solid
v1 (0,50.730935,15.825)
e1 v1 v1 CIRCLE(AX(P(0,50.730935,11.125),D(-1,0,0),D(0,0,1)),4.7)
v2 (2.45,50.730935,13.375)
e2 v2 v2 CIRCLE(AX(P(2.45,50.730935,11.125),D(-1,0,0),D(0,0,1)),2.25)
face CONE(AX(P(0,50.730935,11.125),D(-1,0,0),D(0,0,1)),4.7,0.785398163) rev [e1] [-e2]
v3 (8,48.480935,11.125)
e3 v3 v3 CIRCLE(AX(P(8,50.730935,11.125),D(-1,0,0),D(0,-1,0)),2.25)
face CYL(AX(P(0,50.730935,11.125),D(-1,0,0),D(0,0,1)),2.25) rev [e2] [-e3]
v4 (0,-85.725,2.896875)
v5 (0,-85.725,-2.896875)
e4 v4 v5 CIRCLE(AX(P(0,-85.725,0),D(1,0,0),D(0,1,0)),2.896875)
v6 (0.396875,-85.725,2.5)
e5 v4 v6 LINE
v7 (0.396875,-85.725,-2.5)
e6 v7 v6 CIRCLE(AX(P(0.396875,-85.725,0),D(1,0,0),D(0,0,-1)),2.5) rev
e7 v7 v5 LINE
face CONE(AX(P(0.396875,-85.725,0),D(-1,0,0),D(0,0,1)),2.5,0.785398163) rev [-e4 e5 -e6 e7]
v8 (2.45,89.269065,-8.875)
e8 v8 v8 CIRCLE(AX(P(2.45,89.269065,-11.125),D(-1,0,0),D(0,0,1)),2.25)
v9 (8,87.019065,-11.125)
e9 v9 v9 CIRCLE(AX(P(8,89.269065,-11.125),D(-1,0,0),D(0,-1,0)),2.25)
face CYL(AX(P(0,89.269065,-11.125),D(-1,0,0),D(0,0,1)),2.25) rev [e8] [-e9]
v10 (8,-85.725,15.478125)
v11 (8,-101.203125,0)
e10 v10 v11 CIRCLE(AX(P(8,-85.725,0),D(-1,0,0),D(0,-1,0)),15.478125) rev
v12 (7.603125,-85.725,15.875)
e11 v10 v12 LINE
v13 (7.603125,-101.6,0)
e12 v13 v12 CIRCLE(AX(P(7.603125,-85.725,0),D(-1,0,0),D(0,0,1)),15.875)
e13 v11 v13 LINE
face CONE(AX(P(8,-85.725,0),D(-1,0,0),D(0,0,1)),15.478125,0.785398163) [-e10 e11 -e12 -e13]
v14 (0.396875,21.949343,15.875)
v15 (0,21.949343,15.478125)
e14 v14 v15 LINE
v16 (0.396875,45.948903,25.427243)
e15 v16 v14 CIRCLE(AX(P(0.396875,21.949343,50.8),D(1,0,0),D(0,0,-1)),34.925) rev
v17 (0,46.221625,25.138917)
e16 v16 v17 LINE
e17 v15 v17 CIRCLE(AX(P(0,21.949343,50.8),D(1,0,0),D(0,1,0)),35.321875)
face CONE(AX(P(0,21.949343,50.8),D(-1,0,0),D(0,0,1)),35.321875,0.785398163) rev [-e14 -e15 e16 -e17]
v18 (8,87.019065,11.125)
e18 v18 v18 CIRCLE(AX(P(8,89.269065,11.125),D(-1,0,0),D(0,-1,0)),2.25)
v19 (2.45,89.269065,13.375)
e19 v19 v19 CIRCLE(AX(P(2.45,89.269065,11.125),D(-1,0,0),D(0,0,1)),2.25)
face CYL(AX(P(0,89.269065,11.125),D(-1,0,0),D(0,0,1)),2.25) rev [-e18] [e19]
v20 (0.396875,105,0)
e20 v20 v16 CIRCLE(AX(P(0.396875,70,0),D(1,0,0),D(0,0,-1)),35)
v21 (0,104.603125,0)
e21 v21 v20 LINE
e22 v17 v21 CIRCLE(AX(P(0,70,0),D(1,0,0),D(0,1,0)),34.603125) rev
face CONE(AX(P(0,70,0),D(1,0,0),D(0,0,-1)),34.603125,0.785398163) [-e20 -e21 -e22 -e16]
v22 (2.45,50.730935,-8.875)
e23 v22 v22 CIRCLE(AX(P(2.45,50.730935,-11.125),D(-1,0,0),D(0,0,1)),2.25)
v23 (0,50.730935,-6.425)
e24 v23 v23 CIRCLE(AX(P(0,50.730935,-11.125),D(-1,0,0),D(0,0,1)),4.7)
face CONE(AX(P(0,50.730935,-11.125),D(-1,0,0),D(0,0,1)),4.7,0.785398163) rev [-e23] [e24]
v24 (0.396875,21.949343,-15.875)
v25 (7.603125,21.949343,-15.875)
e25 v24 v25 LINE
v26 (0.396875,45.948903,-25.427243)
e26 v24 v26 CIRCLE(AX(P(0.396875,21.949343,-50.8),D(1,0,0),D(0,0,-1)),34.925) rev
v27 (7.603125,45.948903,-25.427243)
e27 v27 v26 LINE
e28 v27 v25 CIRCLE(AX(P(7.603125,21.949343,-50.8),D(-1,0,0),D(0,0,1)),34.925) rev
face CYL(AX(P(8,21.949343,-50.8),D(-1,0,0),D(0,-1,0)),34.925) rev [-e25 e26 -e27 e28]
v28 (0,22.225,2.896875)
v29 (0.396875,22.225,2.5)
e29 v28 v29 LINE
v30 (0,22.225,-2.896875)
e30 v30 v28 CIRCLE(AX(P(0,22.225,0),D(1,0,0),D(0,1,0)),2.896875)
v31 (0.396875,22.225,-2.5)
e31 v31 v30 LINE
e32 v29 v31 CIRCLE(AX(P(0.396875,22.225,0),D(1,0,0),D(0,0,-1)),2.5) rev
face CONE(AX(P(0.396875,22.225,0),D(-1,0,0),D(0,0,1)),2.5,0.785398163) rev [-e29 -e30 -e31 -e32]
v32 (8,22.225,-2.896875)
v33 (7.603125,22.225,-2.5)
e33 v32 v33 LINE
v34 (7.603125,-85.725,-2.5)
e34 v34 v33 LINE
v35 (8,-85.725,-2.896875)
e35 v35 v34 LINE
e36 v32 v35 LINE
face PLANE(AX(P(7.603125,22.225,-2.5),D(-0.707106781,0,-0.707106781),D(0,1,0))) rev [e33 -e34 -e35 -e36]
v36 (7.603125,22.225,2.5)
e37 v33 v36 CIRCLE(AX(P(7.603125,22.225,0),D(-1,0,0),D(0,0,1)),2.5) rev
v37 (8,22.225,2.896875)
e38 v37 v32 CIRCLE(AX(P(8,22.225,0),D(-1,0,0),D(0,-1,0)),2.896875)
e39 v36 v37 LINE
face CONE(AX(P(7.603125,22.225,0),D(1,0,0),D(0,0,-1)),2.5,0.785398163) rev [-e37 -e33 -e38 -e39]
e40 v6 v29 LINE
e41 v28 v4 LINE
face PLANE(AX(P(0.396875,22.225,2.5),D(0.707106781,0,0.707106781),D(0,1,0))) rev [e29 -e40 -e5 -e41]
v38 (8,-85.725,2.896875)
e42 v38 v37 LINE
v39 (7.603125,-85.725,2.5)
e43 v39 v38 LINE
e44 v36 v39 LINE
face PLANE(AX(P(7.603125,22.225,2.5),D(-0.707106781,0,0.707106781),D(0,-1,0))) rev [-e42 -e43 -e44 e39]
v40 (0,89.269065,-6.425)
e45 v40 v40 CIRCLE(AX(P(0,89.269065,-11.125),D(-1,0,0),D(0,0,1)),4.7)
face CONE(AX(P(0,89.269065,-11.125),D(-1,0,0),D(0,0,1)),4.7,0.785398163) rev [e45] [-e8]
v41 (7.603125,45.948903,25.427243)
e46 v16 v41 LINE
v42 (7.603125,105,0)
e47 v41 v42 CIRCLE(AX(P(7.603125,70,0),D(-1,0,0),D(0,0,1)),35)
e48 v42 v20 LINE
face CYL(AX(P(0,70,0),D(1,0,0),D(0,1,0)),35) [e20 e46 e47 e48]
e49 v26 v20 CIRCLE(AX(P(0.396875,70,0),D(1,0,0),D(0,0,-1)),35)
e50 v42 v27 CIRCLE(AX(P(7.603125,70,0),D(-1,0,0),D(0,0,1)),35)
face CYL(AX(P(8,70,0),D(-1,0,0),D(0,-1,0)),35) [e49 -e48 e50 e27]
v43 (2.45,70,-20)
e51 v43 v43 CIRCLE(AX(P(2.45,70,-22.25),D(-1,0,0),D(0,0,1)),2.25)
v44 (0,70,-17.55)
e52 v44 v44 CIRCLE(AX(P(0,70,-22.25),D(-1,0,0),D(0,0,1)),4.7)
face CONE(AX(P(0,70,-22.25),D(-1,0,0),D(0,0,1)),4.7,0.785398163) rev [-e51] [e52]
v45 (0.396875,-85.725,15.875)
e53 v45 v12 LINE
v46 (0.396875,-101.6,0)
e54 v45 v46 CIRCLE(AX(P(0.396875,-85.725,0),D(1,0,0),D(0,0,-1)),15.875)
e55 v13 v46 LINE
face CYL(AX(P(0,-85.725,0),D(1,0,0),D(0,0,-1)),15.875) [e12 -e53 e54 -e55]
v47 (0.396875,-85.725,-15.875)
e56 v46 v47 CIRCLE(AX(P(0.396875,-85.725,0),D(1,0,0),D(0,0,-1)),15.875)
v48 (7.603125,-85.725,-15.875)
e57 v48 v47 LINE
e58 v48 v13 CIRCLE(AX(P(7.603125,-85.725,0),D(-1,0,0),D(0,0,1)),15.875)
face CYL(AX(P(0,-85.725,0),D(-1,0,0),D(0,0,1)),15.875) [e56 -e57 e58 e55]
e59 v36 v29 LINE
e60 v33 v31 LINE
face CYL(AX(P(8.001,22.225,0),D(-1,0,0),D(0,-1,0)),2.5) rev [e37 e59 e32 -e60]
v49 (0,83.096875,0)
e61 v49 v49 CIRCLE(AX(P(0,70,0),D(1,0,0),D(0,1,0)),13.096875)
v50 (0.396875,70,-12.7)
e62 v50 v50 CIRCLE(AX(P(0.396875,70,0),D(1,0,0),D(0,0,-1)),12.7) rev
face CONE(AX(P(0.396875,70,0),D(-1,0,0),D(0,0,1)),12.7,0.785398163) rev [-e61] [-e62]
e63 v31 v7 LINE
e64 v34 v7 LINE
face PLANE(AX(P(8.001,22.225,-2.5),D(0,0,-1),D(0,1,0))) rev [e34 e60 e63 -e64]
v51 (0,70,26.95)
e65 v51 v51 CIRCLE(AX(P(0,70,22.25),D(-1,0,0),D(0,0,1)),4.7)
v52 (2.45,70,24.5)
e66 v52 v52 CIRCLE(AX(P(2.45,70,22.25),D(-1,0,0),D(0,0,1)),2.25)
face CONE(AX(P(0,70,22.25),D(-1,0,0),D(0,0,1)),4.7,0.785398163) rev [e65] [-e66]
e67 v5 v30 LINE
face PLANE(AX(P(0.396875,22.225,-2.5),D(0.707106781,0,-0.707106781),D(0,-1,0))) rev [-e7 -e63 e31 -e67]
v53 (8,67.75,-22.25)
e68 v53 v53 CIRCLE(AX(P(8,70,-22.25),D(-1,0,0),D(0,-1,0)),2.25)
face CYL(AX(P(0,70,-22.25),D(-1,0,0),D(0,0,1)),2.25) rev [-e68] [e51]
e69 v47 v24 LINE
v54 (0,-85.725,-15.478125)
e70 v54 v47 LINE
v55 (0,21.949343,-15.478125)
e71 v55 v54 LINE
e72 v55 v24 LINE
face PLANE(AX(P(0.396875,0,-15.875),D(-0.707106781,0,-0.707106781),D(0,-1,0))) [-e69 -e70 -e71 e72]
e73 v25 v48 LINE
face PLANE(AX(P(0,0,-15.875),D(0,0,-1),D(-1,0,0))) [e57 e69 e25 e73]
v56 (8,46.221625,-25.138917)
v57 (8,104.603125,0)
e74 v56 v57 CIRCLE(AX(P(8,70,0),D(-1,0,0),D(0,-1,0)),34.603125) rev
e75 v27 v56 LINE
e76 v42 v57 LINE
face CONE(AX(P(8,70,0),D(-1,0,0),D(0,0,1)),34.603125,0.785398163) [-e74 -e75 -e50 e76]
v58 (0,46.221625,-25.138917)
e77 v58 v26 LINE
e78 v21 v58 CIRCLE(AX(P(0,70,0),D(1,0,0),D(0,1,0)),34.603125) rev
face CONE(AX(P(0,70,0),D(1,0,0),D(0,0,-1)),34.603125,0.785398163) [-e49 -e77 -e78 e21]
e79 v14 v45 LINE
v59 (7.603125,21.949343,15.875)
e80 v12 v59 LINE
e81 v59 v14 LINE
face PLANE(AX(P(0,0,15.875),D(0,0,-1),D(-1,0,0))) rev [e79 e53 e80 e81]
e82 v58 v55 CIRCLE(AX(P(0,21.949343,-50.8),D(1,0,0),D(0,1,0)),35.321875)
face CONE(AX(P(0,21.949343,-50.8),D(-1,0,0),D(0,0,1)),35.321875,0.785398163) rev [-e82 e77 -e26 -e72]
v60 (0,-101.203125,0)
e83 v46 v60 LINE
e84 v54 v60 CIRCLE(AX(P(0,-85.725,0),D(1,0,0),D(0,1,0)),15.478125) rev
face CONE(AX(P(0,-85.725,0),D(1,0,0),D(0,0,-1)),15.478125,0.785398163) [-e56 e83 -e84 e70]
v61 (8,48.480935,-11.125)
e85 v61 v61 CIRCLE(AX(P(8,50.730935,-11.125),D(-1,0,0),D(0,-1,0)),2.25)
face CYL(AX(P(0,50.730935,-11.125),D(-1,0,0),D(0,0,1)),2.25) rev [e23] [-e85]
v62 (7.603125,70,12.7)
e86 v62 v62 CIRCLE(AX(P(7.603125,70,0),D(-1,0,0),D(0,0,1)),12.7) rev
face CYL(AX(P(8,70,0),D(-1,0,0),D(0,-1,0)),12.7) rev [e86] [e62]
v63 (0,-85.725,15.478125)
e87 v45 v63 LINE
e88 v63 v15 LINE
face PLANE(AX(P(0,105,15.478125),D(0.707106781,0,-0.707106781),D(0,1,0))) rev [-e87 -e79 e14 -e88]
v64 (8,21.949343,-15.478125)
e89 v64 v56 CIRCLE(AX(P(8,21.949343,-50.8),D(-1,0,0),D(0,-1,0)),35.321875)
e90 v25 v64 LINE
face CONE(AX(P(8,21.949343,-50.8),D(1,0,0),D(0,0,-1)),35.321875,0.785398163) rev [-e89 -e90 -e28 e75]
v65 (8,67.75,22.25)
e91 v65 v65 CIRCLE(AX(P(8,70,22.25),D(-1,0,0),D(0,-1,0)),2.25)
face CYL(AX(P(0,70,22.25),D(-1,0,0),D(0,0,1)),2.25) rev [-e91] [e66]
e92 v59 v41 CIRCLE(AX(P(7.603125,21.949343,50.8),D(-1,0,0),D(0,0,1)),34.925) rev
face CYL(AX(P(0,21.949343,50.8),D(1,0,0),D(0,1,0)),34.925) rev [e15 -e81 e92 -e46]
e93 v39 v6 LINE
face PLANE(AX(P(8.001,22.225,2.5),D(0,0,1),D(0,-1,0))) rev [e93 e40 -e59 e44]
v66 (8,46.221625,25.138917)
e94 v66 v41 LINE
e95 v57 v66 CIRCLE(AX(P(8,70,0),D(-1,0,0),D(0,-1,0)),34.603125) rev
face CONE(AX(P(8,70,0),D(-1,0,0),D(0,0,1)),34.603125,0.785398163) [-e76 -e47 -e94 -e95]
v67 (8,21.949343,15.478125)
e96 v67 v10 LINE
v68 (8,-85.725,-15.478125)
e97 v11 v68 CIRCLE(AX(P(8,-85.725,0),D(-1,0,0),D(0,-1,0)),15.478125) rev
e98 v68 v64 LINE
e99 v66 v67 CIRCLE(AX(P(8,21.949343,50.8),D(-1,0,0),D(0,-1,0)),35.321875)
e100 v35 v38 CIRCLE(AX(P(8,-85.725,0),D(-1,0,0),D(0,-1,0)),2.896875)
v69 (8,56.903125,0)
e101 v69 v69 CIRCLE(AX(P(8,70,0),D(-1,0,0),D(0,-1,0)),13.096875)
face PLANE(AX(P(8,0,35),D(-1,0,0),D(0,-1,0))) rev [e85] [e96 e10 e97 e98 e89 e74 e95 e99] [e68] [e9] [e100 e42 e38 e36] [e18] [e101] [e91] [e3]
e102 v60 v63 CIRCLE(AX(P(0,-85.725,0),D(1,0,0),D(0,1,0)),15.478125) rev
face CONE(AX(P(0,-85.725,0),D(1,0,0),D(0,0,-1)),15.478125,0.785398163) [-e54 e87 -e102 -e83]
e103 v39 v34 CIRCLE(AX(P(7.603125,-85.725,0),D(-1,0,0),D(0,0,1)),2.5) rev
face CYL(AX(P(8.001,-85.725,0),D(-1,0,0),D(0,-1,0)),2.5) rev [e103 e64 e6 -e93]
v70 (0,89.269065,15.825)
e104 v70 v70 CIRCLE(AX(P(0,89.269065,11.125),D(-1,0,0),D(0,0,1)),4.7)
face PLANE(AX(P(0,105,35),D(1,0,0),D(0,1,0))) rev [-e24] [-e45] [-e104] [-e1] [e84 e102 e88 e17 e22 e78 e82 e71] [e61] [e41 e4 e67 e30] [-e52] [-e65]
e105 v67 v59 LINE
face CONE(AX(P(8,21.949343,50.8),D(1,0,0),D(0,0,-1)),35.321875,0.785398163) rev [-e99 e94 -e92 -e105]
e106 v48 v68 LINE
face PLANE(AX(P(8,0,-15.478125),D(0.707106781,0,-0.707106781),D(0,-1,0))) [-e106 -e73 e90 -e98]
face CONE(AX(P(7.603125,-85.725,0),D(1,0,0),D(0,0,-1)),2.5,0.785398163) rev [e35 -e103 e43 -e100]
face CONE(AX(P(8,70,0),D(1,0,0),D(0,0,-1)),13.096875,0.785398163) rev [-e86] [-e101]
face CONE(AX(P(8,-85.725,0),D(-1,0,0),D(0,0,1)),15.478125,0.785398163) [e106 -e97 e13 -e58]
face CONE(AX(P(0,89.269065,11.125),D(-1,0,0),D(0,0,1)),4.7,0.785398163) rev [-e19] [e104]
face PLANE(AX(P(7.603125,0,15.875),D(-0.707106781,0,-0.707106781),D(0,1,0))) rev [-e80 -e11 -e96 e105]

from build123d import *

# Parameters (mm, degrees)
SKETCH1_W                                           = 8
SKETCH1_H                                           = 105
BASE_DEPTH                                          = 35
CSK_FOR_M4_COUNTERSUNK_FLAT_HEAD_SCREW2_D           = 4.5
CSK_FOR_M4_COUNTERSUNK_FLAT_HEAD_SCREW2_CSINK_D     = 9.4
CSK_FOR_M4_COUNTERSUNK_FLAT_HEAD_SCREW2_CSINK_ANGLE = 90
FILLET1_R                                           = 35
SKETCH8_W                                           = 8
SKETCH8_H                                           = 70
BOSS_EXTRUDE1_DEPTH                                 = 101.6
CUT_EXTRUDE1_REACH                                  = 112.968
CUT_EXTRUDE2_DEPTH                                  = 111.968463989
FILLET2_R                                           = 34.925
FILLET3_R                                           = 15.875
SKETCH12_R                                          = 12.7
CUT_EXTRUDE4_DEPTH                                  = 111.968463989
CHAMFER1_SIZE                                       = 0.396875


with BuildPart() as part:
    # Sketch1 → base (new, symmetric)
    with BuildSketch(Plane.XY):
        with Locations((4, 52.5)):
            Rectangle(SKETCH1_W, SKETCH1_H)
    extrude(amount=BASE_DEPTH, both=True)

    # CSK for M4 Countersunk Flat Head Screw2 (through all)
    with Locations(Plane.ZY):
        with Locations((-11.125, 50.730934766), (-22.25, 70), (-11.125, 89.269065234), (11.125, 89.269065234), (22.25, 70), (11.125, 50.730934766)):
            CounterSinkHole(CSK_FOR_M4_COUNTERSUNK_FLAT_HEAD_SCREW2_D / 2, CSK_FOR_M4_COUNTERSUNK_FLAT_HEAD_SCREW2_CSINK_D / 2, counter_sink_angle=CSK_FOR_M4_COUNTERSUNK_FLAT_HEAD_SCREW2_CSINK_ANGLE)

    # Fillet1
    fillet1_edges = [part.edges().sort_by_distance(p)[0] for p in [
        (4, 105, 35),
        (4, 105, -35),
    ]]
    fillet(fillet1_edges, radius=FILLET1_R - 0.0001)  # a hair under: the kernel refuses the full size

    # Sketch8 → Boss-Extrude1 (add)
    with BuildSketch(Plane.XZ):
        with Locations((4, 0)):
            Rectangle(SKETCH8_W, SKETCH8_H)
    extrude(amount=BOSS_EXTRUDE1_DEPTH)

    # Sketch9 → Cut-Extrude1 (cut, up to next)
    with BuildSketch(Plane.ZY, mode=Mode.PRIVATE) as cut_extrude1_sk1:
        with BuildLine():
            Line((2.5, 22.225), (2.5, -85.725))
            ThreePointArc((2.5, -85.725), (0, -88.225), (-2.5, -85.725))
            Line((-2.5, -85.725), (-2.5, 22.225))
            ThreePointArc((-2.5, 22.225), (0, 24.725), (2.5, 22.225))
        make_face()
    cut_extrude1_tool1 = extrude(cut_extrude1_sk1.sketch, amount=-CUT_EXTRUDE1_REACH, mode=Mode.PRIVATE) & part.part
    add(cut_extrude1_tool1.solids().sort_by_distance((0, -31.75, 0))[0], mode=Mode.SUBTRACT)

    # Sketch10 → Cut-Extrude2 (cut, through all)
    with BuildSketch(Plane(origin=(8, 0, 0), x_dir=(0, 0, -1), z_dir=(1, 0, 0))):
        with BuildLine():
            Line((15.875, 38.807302537), (15.875, -101.6))
            Line((15.875, -101.6), (35, -101.6))
            Line((35, -101.6), (35, 70))
            ThreePointArc((35, 70), (29.838104833, 51.705533624), (15.875, 38.807302537))
        make_face()
        with BuildLine():
            Line((-35, -101.6), (-15.875, -101.6))
            Line((-15.875, -101.6), (-15.875, 38.807302537))
            ThreePointArc((-15.875, 38.807302537), (-29.838104833, 51.705533624), (-35, 70))
            Line((-35, 70), (-35, -101.6))
        make_face()
    extrude(amount=-CUT_EXTRUDE2_DEPTH, mode=Mode.SUBTRACT)

    # Fillet2
    fillet2_edges = [part.edges().sort_by_distance(p)[0] for p in [
        (4, 38.807302537, -15.875),
        (4, 38.807302537, 15.875),
    ]]
    fillet(fillet2_edges, radius=FILLET2_R)

    # Fillet3
    fillet3_edges = [part.edges().sort_by_distance(p)[0] for p in [
        (4, -101.6, -15.875),
        (4, -101.6, 15.875),
    ]]
    fillet(fillet3_edges, radius=FILLET3_R - 0.0001)  # a hair under: the kernel refuses the full size

    # Sketch12 → Cut-Extrude4 (cut, through all)
    with BuildSketch(Plane.ZY):
        with Locations(Location((0, 70, 0), (0, 0, 270))):
            Circle(SKETCH12_R)
    extrude(amount=-CUT_EXTRUDE4_DEPTH, mode=Mode.SUBTRACT)

    # Chamfer1
    chamfer1_edges = [part.edges().sort_by_distance(p)[0] for p in [
        (8, 94.748766631, -24.748766631),
        (0, 94.748766631, 24.748766631),
        (8, 34.864684854, -18.350815522),
        (0, 34.864684854, -18.350815522),
        (8, 34.864684854, 18.350815522),
        (0, 34.864684854, 18.350815522),
        (8, -31.887878432, -15.875),
        (8, -31.887878432, 15.875),
        (8, -96.950349441, 11.225349441),
        (8, -96.950349441, -11.225349441),
        (0, -31.887878432, -15.875),
        (0, -31.887878432, 15.875),
        (0, -96.950349441, 11.225349441),
        (0, -96.950349441, -11.225349441),
        (8, 82.7, 0),
        (0, 82.7, 0),
        (0, 94.748766631, -24.748766631),
        (8, 94.748766631, 24.748766631),
        (0, 24.725, 0),
        (0, -31.75, -2.5),
        (0, -88.225, 0),
        (0, -31.75, 2.5),
        (8, -31.75, -2.5),
        (8, 24.725, 0),
        (8, -31.75, 2.5),
        (8, -88.225, 0),
    ]]
    chamfer(chamfer1_edges, length=CHAMFER1_SIZE)


solid = part.part
